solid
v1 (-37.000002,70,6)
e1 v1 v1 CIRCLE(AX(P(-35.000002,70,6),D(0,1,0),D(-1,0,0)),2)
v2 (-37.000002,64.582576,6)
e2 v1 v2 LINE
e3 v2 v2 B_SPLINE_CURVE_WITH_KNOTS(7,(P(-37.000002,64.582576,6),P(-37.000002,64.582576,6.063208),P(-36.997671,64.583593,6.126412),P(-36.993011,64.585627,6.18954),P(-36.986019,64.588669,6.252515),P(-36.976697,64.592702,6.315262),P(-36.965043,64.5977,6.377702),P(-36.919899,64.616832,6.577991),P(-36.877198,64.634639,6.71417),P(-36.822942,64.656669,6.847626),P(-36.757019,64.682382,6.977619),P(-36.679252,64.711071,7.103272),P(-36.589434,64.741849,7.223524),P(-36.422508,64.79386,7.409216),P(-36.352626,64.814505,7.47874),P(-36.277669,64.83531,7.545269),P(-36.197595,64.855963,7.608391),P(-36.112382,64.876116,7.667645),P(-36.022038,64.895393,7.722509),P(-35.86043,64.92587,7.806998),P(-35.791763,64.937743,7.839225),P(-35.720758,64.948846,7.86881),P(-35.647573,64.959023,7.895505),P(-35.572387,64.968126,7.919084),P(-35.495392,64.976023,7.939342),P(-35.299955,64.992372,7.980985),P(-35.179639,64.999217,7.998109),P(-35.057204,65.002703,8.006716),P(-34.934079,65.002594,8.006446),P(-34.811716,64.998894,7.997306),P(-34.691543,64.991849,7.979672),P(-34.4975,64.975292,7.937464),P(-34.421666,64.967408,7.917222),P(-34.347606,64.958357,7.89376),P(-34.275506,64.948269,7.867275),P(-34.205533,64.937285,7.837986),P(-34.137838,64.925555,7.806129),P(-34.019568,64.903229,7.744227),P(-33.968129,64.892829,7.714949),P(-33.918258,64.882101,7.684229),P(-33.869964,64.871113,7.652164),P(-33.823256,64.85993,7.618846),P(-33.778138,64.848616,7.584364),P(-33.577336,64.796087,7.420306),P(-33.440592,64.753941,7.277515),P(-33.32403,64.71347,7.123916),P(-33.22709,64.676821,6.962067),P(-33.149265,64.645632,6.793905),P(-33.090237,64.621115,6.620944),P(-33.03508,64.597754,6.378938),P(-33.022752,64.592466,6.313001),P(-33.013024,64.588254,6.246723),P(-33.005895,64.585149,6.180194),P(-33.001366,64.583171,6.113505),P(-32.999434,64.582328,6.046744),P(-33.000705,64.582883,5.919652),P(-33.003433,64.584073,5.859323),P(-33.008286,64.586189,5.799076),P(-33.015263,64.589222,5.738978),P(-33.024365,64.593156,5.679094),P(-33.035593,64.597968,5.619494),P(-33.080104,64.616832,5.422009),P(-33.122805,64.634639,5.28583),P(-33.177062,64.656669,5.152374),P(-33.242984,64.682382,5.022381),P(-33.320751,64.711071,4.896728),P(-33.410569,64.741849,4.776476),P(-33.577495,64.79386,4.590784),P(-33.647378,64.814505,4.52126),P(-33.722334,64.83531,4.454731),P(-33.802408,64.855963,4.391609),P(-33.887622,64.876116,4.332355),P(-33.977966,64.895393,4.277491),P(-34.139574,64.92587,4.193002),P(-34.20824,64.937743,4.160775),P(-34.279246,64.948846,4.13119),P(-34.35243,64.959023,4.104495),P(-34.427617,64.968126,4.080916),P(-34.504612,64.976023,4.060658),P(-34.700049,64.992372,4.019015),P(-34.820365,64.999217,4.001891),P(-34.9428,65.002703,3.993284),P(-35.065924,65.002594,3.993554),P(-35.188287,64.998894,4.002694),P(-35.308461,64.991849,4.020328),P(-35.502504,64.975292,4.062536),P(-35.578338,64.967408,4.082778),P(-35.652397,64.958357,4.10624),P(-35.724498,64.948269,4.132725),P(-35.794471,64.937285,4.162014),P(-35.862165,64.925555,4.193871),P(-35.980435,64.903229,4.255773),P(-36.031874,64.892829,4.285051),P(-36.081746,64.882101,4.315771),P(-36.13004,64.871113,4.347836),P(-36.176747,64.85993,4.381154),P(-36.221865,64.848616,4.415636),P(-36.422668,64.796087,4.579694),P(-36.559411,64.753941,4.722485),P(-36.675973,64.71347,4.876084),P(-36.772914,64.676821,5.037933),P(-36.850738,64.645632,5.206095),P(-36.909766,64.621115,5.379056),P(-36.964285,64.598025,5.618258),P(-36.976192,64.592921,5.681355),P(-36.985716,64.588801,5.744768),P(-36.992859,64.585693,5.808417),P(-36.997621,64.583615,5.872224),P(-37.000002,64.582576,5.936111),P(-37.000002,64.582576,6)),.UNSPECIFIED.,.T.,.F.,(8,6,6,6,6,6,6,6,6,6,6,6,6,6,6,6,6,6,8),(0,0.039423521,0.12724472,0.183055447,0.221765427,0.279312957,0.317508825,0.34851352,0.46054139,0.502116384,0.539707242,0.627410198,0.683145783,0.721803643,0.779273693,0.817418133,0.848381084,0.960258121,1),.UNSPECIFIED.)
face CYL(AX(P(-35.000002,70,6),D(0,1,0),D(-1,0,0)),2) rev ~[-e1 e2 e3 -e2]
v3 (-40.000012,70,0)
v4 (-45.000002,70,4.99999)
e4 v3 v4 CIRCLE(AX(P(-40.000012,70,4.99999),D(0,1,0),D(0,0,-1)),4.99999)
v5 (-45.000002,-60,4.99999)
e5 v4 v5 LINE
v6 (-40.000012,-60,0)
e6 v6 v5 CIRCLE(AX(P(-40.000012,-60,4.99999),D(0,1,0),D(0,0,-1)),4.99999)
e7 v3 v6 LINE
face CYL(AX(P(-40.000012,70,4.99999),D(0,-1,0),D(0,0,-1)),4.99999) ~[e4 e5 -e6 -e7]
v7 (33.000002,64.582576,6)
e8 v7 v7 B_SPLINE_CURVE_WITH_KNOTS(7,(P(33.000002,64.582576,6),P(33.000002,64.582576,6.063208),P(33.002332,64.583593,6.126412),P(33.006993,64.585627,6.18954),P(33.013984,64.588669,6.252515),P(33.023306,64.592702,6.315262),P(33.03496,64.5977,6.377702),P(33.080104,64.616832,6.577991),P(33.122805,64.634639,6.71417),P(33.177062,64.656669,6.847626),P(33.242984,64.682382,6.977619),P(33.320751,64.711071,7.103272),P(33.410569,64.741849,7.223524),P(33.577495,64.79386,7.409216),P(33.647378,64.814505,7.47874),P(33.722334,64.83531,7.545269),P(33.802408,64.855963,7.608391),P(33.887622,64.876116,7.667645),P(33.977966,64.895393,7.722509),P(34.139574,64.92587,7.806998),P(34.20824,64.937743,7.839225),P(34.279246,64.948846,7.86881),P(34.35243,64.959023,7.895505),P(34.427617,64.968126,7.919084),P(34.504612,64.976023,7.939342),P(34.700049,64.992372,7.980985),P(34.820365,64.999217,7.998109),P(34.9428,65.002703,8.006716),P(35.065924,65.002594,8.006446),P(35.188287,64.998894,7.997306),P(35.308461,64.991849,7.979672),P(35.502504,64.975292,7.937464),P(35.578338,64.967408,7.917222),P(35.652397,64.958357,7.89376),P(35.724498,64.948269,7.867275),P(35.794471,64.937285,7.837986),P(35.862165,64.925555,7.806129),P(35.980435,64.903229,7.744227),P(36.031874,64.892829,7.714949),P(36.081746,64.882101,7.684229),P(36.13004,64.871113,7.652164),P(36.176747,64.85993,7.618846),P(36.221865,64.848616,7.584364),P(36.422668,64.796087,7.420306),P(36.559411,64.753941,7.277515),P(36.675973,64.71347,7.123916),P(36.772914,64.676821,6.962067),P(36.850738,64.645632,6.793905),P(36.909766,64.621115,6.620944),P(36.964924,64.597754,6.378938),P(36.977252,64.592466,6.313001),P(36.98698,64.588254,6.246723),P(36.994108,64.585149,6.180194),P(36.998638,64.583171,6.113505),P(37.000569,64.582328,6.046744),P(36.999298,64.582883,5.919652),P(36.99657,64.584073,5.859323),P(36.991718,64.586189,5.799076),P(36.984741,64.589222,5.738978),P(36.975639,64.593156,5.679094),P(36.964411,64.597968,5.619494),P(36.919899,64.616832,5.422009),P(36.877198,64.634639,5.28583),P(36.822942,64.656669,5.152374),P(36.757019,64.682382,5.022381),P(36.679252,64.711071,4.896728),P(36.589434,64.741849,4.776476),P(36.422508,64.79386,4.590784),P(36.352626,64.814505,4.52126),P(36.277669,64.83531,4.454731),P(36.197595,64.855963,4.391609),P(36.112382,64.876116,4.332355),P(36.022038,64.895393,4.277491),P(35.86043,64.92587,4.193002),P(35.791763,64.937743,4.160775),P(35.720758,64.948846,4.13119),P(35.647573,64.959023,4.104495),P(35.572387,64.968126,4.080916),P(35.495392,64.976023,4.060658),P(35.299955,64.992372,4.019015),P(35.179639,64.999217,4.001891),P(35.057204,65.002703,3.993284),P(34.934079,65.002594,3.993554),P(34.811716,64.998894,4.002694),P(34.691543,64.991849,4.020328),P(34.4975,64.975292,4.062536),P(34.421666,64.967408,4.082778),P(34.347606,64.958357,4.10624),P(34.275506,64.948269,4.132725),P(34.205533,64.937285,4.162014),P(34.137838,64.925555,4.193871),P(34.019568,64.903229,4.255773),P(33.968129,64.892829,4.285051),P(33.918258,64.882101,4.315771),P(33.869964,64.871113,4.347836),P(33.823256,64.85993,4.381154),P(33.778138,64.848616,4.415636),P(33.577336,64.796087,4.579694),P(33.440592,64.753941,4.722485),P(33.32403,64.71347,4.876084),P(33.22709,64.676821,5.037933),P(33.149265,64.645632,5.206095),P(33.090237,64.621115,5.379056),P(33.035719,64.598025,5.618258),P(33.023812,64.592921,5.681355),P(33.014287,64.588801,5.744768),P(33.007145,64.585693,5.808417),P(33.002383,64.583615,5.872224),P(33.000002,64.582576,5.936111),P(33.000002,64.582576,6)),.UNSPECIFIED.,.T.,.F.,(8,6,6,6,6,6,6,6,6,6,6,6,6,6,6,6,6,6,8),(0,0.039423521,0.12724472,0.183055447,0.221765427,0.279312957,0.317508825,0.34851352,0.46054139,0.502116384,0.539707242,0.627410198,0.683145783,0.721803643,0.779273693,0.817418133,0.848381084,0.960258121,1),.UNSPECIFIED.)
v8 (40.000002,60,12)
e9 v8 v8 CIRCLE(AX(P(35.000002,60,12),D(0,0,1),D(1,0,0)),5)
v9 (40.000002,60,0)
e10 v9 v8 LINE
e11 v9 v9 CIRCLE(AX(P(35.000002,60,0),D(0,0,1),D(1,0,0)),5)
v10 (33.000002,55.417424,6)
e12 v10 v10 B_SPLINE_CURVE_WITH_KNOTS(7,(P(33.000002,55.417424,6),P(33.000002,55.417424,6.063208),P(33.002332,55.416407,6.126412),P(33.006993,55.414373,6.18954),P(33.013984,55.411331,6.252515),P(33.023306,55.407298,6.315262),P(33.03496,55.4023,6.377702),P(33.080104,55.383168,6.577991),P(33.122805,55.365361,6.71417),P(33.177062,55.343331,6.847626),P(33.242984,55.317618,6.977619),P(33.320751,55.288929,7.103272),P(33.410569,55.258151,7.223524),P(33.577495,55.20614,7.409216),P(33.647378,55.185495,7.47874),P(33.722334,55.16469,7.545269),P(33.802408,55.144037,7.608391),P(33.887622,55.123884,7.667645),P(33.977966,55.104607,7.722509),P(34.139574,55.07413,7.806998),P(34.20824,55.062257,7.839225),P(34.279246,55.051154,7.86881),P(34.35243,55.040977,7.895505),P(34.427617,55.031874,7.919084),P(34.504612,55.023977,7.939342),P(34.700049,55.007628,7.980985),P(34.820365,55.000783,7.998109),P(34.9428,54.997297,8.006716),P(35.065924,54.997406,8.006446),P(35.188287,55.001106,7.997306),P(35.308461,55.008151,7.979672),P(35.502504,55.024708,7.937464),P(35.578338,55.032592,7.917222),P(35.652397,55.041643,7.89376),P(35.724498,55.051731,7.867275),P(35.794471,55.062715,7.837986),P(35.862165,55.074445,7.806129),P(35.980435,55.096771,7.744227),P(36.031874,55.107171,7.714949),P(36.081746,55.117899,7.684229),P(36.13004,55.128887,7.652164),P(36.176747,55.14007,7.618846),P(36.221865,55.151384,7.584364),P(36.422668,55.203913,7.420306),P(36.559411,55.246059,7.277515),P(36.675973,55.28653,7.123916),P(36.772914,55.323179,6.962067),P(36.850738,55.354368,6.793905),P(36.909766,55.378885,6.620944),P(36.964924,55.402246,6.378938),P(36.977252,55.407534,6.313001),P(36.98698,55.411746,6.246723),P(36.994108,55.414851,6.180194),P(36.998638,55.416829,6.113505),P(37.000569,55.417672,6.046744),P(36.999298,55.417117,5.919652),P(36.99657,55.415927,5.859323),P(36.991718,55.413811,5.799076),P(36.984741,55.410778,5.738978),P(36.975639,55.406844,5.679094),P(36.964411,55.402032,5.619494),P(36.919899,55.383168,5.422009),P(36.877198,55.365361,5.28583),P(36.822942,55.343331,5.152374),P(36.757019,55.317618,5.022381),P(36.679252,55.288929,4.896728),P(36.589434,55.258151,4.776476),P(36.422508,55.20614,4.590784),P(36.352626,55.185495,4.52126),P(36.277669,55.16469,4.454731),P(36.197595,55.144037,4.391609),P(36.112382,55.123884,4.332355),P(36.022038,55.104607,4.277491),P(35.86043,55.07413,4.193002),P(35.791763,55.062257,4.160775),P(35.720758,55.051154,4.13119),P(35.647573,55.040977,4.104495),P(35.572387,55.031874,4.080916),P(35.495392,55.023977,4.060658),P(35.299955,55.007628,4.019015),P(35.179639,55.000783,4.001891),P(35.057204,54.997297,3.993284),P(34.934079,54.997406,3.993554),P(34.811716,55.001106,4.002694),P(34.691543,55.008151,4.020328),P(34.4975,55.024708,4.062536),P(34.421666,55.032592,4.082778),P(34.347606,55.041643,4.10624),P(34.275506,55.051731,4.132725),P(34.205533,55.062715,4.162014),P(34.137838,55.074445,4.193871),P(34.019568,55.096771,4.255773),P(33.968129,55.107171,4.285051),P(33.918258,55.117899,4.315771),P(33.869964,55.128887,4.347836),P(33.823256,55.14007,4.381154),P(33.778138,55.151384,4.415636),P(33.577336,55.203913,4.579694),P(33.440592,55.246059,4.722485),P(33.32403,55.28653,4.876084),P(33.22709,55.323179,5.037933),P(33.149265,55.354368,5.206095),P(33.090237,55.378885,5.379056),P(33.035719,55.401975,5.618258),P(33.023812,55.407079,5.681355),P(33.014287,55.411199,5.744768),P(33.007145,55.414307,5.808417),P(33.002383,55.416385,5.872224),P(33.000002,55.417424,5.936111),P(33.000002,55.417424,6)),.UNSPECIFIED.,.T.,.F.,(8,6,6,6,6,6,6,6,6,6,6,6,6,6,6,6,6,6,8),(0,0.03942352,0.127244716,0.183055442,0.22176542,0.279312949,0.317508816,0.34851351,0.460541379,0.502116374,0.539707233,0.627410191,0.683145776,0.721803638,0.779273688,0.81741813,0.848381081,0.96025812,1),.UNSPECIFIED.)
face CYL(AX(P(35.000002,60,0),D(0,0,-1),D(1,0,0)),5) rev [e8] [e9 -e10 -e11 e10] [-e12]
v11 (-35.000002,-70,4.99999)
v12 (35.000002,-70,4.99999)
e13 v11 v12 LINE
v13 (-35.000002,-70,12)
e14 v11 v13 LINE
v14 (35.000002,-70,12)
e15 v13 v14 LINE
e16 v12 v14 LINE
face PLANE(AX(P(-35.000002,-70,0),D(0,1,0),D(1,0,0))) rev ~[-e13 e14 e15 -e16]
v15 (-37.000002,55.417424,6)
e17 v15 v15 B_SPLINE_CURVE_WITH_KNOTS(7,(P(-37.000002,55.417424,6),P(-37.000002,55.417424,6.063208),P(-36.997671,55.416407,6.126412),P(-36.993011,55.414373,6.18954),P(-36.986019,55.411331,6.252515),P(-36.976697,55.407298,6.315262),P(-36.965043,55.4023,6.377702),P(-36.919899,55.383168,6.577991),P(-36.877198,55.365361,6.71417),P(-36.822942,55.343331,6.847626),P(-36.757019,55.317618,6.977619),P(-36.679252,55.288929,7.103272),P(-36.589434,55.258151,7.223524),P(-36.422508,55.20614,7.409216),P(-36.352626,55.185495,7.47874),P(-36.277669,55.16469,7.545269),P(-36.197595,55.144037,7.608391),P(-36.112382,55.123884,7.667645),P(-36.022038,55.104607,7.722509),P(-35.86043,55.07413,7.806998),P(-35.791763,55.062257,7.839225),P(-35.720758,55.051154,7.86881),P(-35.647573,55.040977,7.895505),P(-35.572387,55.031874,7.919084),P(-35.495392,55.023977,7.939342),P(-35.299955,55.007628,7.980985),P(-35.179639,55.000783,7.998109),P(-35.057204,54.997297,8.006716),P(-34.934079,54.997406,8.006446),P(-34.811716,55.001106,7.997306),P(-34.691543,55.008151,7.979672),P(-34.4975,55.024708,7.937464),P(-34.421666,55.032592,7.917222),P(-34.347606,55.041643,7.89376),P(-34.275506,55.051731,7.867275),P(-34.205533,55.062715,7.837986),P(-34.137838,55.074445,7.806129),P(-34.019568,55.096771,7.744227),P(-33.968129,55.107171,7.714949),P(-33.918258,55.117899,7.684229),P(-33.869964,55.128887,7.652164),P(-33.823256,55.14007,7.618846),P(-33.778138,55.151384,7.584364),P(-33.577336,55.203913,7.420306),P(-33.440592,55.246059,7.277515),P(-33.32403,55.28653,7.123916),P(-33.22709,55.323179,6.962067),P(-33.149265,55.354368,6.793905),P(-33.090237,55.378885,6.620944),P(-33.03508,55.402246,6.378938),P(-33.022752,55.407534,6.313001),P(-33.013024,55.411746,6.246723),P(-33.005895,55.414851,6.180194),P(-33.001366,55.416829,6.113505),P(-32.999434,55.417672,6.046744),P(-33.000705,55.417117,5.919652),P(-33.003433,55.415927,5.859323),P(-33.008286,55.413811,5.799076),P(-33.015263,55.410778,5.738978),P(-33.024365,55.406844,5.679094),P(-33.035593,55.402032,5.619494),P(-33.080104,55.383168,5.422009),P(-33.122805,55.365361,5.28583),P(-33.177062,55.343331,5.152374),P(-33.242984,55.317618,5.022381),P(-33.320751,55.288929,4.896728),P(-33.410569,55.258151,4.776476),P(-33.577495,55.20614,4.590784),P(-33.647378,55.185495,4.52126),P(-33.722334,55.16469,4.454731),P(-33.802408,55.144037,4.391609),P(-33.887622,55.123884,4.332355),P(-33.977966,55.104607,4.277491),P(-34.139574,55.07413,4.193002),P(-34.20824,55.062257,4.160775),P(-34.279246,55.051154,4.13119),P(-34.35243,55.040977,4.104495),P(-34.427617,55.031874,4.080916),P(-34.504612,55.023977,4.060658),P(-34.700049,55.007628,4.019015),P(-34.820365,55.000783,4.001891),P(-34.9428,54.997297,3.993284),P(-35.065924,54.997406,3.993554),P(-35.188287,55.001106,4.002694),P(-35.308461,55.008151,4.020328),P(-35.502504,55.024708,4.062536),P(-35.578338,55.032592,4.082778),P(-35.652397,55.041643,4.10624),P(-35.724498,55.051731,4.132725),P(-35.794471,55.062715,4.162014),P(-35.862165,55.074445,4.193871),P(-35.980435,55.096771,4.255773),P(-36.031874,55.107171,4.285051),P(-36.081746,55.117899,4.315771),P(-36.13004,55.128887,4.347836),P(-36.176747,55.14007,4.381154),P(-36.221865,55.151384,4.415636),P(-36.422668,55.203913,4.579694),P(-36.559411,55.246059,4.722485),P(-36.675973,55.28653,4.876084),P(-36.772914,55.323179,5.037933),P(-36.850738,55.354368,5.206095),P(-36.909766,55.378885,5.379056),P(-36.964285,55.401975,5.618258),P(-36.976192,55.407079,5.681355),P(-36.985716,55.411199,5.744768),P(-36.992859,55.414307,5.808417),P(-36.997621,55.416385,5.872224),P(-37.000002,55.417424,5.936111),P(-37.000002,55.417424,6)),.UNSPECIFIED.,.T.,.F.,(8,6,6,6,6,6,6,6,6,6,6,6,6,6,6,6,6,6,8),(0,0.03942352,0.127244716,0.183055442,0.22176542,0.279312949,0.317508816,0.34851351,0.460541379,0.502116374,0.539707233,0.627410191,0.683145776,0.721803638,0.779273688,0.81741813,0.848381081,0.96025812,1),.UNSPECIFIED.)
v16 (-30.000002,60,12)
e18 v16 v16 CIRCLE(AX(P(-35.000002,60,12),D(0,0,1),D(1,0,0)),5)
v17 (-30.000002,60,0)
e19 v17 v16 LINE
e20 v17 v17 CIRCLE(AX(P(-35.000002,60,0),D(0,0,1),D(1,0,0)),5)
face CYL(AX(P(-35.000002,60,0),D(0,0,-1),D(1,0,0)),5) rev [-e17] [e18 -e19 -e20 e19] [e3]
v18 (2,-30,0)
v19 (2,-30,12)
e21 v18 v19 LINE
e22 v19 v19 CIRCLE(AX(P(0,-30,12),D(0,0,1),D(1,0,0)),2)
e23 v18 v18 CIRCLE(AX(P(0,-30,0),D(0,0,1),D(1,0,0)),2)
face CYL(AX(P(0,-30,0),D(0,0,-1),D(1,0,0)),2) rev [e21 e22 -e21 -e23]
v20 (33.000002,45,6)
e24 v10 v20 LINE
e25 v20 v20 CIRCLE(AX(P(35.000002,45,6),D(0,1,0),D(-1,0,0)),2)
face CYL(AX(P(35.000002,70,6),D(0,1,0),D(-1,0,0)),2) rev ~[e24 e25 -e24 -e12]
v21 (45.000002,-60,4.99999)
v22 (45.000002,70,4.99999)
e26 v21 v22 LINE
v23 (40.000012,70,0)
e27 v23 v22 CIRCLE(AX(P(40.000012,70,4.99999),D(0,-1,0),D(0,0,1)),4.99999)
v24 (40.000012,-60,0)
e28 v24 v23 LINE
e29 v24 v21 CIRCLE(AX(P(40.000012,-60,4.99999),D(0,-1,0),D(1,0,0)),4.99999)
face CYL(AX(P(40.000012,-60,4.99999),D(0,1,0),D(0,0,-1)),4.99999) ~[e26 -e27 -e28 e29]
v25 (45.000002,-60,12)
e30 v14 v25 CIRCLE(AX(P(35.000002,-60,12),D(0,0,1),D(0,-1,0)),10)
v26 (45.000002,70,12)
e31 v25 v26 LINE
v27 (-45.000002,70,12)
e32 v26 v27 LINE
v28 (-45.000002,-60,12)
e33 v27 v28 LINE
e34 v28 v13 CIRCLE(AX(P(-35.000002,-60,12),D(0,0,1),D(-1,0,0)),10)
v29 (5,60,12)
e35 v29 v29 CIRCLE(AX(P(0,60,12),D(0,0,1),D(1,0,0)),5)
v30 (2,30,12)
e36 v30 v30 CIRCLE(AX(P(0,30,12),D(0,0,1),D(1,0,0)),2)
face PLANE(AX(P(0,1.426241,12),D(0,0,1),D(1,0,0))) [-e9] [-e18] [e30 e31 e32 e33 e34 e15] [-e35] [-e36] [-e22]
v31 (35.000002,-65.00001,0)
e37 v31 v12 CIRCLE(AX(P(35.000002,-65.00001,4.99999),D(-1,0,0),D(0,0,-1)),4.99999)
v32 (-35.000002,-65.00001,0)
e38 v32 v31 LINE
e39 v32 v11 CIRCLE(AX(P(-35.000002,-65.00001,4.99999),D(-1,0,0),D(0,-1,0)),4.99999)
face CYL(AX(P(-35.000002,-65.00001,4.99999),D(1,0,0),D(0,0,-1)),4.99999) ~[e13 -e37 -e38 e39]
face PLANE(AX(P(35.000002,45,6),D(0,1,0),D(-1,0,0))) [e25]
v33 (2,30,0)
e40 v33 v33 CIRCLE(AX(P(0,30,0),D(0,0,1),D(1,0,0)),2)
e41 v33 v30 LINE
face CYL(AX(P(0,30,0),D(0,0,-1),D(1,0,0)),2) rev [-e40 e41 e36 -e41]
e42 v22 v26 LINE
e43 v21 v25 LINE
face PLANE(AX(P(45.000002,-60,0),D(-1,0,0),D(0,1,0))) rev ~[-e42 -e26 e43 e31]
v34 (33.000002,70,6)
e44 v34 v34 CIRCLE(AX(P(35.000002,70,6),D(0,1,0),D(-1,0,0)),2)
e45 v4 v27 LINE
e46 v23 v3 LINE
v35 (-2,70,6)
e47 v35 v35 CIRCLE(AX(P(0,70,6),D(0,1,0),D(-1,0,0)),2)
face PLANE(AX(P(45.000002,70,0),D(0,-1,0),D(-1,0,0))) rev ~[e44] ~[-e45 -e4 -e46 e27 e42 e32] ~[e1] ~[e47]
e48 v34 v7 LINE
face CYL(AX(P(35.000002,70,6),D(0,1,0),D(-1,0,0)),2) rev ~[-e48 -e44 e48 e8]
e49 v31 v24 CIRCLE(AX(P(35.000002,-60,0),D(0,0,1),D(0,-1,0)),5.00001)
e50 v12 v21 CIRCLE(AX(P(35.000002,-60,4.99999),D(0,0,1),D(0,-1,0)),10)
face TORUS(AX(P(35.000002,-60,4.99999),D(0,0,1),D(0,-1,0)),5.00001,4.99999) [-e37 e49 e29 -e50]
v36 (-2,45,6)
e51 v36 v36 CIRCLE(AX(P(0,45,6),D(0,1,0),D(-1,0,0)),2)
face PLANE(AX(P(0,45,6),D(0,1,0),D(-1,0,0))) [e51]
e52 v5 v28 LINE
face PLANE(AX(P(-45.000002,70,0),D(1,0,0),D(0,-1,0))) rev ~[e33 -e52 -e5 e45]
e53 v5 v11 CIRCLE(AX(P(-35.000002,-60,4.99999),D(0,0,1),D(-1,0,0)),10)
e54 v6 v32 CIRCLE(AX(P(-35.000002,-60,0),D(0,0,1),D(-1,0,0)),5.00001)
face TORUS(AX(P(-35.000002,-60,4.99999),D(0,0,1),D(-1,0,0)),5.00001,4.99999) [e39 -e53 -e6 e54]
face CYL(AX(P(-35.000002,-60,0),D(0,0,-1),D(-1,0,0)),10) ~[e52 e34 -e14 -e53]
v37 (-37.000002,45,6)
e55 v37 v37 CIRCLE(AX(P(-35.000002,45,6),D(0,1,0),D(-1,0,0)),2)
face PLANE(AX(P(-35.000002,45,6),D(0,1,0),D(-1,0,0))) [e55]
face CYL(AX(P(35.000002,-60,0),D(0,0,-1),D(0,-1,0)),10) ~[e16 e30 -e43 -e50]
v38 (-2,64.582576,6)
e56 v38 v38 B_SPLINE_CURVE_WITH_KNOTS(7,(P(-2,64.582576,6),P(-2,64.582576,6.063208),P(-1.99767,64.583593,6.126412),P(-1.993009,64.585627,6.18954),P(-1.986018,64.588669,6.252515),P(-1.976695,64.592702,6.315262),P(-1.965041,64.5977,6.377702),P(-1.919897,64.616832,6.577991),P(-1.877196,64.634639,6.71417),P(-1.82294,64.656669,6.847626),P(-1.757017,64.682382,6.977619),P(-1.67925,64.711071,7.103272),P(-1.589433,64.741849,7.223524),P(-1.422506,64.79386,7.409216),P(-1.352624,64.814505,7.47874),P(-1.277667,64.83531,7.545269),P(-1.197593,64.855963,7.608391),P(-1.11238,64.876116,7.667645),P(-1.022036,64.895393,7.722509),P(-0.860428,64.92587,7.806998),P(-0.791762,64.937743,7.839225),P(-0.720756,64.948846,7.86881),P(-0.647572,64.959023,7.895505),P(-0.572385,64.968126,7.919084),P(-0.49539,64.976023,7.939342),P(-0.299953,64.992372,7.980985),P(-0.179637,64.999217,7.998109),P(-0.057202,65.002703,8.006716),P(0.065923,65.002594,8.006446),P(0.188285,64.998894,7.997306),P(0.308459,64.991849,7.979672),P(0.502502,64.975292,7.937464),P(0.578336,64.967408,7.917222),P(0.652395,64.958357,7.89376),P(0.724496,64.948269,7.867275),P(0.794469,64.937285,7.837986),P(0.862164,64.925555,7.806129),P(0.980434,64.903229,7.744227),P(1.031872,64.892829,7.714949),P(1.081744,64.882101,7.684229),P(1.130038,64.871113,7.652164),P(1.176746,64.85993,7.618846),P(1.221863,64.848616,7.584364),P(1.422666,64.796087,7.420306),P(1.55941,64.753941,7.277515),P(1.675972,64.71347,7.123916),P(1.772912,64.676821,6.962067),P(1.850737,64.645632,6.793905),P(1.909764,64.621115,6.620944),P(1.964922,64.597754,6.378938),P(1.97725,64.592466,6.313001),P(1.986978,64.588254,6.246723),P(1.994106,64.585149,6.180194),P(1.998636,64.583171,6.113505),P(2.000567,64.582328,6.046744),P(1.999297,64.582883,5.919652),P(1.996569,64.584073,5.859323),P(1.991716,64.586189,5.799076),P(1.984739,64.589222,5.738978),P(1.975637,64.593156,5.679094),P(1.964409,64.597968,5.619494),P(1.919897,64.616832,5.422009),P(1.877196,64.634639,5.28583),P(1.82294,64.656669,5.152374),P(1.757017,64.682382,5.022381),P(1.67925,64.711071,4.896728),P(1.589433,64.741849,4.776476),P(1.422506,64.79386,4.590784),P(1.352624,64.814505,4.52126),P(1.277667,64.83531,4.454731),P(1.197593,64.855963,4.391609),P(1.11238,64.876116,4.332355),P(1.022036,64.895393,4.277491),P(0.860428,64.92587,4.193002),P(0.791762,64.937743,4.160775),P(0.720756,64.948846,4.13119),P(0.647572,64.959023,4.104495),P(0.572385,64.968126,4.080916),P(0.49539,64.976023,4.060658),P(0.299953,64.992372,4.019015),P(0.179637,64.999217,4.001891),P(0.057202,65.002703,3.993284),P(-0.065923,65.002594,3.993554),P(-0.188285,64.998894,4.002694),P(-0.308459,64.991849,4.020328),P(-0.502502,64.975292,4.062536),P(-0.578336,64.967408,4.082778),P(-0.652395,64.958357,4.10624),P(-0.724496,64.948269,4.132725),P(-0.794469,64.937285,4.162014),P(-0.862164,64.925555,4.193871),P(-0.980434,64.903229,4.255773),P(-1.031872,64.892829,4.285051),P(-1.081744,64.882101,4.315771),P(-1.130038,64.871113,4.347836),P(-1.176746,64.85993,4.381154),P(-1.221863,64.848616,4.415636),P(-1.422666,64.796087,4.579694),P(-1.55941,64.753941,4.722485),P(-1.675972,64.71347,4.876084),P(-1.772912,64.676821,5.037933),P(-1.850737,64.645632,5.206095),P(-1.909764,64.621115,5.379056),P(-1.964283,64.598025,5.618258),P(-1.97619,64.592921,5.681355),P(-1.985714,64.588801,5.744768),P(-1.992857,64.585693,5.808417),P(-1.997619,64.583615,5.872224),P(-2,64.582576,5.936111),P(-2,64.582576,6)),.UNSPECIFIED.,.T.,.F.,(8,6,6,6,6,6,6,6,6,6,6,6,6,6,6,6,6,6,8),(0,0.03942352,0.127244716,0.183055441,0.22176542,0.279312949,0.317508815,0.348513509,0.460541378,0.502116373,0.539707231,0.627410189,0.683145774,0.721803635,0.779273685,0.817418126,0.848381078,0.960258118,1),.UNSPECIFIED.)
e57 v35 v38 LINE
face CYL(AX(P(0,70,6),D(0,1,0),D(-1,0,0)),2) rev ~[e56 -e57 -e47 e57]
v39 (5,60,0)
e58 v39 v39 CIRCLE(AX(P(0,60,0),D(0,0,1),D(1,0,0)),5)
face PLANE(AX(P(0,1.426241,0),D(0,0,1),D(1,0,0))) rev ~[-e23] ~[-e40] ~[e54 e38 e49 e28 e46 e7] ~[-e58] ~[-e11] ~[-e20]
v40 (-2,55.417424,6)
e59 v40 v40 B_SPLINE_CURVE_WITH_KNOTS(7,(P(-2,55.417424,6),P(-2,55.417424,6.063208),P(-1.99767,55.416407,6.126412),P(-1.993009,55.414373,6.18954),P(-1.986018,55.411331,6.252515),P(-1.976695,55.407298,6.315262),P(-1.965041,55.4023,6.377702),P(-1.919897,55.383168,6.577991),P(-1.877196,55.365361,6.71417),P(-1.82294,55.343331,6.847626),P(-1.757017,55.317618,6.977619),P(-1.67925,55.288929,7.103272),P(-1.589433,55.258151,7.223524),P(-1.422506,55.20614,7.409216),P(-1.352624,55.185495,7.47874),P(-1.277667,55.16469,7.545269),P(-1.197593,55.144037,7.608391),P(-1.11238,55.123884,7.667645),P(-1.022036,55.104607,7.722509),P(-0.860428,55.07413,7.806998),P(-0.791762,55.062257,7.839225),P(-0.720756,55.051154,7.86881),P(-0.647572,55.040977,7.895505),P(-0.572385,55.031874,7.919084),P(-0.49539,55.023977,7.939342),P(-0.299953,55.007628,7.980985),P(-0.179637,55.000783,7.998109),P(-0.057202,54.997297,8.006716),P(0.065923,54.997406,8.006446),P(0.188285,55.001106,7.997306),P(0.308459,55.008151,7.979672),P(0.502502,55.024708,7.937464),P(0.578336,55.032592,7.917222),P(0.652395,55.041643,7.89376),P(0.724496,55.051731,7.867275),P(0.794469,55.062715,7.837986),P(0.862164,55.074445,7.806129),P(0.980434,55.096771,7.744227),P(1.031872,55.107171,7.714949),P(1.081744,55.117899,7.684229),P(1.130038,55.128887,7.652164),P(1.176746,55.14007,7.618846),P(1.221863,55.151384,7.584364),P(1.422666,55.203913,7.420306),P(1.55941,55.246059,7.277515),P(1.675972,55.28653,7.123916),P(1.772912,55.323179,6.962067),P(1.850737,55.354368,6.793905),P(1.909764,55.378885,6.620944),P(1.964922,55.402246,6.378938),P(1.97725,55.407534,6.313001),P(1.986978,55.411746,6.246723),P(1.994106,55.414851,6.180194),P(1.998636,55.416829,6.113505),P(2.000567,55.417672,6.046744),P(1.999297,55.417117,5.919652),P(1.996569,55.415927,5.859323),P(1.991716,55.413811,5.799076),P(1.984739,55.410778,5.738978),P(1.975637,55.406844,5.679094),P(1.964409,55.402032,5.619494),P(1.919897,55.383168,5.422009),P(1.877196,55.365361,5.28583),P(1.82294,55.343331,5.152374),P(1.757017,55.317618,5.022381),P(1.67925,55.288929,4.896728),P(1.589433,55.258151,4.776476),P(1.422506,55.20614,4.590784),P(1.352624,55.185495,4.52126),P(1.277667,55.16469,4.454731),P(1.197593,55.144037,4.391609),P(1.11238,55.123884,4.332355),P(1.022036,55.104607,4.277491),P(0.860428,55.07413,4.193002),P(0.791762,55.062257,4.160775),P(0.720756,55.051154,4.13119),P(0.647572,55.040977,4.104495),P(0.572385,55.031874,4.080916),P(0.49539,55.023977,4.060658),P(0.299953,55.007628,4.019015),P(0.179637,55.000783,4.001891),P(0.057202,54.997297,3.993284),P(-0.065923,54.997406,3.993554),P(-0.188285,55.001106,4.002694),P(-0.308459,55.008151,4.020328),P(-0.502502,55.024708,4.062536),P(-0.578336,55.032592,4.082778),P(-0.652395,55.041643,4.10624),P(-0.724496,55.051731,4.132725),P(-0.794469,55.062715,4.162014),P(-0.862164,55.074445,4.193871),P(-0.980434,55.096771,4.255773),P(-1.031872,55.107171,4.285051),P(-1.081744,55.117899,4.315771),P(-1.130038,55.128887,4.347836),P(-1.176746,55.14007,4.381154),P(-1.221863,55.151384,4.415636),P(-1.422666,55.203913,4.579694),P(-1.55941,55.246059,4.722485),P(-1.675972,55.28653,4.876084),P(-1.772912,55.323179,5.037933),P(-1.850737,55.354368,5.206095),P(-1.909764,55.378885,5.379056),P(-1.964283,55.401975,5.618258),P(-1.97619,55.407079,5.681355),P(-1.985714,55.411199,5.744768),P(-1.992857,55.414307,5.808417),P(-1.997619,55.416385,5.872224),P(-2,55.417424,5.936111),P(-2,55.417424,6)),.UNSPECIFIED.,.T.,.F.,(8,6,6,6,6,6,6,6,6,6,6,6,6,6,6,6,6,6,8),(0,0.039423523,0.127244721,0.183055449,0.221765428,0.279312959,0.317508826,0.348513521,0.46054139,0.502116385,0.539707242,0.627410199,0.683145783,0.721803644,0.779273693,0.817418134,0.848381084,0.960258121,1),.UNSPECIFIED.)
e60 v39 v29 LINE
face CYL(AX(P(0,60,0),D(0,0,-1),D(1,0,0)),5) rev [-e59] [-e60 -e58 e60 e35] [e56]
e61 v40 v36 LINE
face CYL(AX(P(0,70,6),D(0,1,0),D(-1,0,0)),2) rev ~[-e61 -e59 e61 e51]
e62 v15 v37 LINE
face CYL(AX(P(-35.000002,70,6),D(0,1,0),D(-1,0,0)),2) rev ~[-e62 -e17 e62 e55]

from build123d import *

# Parameters (mm, degrees)
F0_R     = 2
F0_R_2   = 5
F1_DEPTH = 12
F2_R     = 2
F3_DEPTH = 25
F4_R     = 4.99999


# Not quite as in the source:
# - a fillet or chamfer is up to 0.001 mm smaller than in the source, because OpenCascade refuses the exact size


with BuildPart() as f1:
    # F0 (on Top) → F1 (new body)
    with BuildSketch(Plane.XY):
        with BuildLine():
            Line((-35.0000017881, -70), (35.0000017881, -70))
            ThreePointArc((35.0000017881, -70), (42.0710696, -67.0710678119), (45.0000017881, -60))
            Line((45.0000017881, -60), (45.0000017881, 70))
            Line((45.0000017881, 70), (-45.0000017881, 70))
            Line((-45.0000017881, 70), (-45.0000017881, -60))
            ThreePointArc((-45.0000017881, -60), (-42.0710696, -67.0710678119), (-35.0000017881, -70))
        make_face()
        with Locations((0, -30)):
            Circle(F0_R, mode=Mode.SUBTRACT)
        with Locations((0, 30)):
            Circle(F0_R, mode=Mode.SUBTRACT)
        with Locations((-35.0000017881, 60)):
            Circle(F0_R_2, mode=Mode.SUBTRACT)
        with Locations((0, 60)):
            Circle(F0_R_2, mode=Mode.SUBTRACT)
        with Locations((35.0000017881, 60)):
            Circle(F0_R_2, mode=Mode.SUBTRACT)
    extrude(amount=F1_DEPTH)

    # F2 (on face) → F3 (cut)
    with BuildSketch(Plane(origin=(0, 70, 0), x_dir=(-1, 0, 0), z_dir=(0, 1, 0))):
        with Locations((0, 6)):
            Circle(F2_R)
        with Locations((35.0000017881, 6)):
            Circle(F2_R)
        with Locations((-35.0000017881, 6)):
            Circle(F2_R)
    extrude(amount=-F3_DEPTH, mode=Mode.SUBTRACT)

    # F4 (radius 5 in the source; OpenCascade refuses exactly that, so slightly less here)
    f4_edges = [f1.edges().sort_by_distance(p)[0] for p in [
        (45.000002, 5, 0),
    ]]
    fillet(f4_edges, radius=F4_R)


solid = f1.part
